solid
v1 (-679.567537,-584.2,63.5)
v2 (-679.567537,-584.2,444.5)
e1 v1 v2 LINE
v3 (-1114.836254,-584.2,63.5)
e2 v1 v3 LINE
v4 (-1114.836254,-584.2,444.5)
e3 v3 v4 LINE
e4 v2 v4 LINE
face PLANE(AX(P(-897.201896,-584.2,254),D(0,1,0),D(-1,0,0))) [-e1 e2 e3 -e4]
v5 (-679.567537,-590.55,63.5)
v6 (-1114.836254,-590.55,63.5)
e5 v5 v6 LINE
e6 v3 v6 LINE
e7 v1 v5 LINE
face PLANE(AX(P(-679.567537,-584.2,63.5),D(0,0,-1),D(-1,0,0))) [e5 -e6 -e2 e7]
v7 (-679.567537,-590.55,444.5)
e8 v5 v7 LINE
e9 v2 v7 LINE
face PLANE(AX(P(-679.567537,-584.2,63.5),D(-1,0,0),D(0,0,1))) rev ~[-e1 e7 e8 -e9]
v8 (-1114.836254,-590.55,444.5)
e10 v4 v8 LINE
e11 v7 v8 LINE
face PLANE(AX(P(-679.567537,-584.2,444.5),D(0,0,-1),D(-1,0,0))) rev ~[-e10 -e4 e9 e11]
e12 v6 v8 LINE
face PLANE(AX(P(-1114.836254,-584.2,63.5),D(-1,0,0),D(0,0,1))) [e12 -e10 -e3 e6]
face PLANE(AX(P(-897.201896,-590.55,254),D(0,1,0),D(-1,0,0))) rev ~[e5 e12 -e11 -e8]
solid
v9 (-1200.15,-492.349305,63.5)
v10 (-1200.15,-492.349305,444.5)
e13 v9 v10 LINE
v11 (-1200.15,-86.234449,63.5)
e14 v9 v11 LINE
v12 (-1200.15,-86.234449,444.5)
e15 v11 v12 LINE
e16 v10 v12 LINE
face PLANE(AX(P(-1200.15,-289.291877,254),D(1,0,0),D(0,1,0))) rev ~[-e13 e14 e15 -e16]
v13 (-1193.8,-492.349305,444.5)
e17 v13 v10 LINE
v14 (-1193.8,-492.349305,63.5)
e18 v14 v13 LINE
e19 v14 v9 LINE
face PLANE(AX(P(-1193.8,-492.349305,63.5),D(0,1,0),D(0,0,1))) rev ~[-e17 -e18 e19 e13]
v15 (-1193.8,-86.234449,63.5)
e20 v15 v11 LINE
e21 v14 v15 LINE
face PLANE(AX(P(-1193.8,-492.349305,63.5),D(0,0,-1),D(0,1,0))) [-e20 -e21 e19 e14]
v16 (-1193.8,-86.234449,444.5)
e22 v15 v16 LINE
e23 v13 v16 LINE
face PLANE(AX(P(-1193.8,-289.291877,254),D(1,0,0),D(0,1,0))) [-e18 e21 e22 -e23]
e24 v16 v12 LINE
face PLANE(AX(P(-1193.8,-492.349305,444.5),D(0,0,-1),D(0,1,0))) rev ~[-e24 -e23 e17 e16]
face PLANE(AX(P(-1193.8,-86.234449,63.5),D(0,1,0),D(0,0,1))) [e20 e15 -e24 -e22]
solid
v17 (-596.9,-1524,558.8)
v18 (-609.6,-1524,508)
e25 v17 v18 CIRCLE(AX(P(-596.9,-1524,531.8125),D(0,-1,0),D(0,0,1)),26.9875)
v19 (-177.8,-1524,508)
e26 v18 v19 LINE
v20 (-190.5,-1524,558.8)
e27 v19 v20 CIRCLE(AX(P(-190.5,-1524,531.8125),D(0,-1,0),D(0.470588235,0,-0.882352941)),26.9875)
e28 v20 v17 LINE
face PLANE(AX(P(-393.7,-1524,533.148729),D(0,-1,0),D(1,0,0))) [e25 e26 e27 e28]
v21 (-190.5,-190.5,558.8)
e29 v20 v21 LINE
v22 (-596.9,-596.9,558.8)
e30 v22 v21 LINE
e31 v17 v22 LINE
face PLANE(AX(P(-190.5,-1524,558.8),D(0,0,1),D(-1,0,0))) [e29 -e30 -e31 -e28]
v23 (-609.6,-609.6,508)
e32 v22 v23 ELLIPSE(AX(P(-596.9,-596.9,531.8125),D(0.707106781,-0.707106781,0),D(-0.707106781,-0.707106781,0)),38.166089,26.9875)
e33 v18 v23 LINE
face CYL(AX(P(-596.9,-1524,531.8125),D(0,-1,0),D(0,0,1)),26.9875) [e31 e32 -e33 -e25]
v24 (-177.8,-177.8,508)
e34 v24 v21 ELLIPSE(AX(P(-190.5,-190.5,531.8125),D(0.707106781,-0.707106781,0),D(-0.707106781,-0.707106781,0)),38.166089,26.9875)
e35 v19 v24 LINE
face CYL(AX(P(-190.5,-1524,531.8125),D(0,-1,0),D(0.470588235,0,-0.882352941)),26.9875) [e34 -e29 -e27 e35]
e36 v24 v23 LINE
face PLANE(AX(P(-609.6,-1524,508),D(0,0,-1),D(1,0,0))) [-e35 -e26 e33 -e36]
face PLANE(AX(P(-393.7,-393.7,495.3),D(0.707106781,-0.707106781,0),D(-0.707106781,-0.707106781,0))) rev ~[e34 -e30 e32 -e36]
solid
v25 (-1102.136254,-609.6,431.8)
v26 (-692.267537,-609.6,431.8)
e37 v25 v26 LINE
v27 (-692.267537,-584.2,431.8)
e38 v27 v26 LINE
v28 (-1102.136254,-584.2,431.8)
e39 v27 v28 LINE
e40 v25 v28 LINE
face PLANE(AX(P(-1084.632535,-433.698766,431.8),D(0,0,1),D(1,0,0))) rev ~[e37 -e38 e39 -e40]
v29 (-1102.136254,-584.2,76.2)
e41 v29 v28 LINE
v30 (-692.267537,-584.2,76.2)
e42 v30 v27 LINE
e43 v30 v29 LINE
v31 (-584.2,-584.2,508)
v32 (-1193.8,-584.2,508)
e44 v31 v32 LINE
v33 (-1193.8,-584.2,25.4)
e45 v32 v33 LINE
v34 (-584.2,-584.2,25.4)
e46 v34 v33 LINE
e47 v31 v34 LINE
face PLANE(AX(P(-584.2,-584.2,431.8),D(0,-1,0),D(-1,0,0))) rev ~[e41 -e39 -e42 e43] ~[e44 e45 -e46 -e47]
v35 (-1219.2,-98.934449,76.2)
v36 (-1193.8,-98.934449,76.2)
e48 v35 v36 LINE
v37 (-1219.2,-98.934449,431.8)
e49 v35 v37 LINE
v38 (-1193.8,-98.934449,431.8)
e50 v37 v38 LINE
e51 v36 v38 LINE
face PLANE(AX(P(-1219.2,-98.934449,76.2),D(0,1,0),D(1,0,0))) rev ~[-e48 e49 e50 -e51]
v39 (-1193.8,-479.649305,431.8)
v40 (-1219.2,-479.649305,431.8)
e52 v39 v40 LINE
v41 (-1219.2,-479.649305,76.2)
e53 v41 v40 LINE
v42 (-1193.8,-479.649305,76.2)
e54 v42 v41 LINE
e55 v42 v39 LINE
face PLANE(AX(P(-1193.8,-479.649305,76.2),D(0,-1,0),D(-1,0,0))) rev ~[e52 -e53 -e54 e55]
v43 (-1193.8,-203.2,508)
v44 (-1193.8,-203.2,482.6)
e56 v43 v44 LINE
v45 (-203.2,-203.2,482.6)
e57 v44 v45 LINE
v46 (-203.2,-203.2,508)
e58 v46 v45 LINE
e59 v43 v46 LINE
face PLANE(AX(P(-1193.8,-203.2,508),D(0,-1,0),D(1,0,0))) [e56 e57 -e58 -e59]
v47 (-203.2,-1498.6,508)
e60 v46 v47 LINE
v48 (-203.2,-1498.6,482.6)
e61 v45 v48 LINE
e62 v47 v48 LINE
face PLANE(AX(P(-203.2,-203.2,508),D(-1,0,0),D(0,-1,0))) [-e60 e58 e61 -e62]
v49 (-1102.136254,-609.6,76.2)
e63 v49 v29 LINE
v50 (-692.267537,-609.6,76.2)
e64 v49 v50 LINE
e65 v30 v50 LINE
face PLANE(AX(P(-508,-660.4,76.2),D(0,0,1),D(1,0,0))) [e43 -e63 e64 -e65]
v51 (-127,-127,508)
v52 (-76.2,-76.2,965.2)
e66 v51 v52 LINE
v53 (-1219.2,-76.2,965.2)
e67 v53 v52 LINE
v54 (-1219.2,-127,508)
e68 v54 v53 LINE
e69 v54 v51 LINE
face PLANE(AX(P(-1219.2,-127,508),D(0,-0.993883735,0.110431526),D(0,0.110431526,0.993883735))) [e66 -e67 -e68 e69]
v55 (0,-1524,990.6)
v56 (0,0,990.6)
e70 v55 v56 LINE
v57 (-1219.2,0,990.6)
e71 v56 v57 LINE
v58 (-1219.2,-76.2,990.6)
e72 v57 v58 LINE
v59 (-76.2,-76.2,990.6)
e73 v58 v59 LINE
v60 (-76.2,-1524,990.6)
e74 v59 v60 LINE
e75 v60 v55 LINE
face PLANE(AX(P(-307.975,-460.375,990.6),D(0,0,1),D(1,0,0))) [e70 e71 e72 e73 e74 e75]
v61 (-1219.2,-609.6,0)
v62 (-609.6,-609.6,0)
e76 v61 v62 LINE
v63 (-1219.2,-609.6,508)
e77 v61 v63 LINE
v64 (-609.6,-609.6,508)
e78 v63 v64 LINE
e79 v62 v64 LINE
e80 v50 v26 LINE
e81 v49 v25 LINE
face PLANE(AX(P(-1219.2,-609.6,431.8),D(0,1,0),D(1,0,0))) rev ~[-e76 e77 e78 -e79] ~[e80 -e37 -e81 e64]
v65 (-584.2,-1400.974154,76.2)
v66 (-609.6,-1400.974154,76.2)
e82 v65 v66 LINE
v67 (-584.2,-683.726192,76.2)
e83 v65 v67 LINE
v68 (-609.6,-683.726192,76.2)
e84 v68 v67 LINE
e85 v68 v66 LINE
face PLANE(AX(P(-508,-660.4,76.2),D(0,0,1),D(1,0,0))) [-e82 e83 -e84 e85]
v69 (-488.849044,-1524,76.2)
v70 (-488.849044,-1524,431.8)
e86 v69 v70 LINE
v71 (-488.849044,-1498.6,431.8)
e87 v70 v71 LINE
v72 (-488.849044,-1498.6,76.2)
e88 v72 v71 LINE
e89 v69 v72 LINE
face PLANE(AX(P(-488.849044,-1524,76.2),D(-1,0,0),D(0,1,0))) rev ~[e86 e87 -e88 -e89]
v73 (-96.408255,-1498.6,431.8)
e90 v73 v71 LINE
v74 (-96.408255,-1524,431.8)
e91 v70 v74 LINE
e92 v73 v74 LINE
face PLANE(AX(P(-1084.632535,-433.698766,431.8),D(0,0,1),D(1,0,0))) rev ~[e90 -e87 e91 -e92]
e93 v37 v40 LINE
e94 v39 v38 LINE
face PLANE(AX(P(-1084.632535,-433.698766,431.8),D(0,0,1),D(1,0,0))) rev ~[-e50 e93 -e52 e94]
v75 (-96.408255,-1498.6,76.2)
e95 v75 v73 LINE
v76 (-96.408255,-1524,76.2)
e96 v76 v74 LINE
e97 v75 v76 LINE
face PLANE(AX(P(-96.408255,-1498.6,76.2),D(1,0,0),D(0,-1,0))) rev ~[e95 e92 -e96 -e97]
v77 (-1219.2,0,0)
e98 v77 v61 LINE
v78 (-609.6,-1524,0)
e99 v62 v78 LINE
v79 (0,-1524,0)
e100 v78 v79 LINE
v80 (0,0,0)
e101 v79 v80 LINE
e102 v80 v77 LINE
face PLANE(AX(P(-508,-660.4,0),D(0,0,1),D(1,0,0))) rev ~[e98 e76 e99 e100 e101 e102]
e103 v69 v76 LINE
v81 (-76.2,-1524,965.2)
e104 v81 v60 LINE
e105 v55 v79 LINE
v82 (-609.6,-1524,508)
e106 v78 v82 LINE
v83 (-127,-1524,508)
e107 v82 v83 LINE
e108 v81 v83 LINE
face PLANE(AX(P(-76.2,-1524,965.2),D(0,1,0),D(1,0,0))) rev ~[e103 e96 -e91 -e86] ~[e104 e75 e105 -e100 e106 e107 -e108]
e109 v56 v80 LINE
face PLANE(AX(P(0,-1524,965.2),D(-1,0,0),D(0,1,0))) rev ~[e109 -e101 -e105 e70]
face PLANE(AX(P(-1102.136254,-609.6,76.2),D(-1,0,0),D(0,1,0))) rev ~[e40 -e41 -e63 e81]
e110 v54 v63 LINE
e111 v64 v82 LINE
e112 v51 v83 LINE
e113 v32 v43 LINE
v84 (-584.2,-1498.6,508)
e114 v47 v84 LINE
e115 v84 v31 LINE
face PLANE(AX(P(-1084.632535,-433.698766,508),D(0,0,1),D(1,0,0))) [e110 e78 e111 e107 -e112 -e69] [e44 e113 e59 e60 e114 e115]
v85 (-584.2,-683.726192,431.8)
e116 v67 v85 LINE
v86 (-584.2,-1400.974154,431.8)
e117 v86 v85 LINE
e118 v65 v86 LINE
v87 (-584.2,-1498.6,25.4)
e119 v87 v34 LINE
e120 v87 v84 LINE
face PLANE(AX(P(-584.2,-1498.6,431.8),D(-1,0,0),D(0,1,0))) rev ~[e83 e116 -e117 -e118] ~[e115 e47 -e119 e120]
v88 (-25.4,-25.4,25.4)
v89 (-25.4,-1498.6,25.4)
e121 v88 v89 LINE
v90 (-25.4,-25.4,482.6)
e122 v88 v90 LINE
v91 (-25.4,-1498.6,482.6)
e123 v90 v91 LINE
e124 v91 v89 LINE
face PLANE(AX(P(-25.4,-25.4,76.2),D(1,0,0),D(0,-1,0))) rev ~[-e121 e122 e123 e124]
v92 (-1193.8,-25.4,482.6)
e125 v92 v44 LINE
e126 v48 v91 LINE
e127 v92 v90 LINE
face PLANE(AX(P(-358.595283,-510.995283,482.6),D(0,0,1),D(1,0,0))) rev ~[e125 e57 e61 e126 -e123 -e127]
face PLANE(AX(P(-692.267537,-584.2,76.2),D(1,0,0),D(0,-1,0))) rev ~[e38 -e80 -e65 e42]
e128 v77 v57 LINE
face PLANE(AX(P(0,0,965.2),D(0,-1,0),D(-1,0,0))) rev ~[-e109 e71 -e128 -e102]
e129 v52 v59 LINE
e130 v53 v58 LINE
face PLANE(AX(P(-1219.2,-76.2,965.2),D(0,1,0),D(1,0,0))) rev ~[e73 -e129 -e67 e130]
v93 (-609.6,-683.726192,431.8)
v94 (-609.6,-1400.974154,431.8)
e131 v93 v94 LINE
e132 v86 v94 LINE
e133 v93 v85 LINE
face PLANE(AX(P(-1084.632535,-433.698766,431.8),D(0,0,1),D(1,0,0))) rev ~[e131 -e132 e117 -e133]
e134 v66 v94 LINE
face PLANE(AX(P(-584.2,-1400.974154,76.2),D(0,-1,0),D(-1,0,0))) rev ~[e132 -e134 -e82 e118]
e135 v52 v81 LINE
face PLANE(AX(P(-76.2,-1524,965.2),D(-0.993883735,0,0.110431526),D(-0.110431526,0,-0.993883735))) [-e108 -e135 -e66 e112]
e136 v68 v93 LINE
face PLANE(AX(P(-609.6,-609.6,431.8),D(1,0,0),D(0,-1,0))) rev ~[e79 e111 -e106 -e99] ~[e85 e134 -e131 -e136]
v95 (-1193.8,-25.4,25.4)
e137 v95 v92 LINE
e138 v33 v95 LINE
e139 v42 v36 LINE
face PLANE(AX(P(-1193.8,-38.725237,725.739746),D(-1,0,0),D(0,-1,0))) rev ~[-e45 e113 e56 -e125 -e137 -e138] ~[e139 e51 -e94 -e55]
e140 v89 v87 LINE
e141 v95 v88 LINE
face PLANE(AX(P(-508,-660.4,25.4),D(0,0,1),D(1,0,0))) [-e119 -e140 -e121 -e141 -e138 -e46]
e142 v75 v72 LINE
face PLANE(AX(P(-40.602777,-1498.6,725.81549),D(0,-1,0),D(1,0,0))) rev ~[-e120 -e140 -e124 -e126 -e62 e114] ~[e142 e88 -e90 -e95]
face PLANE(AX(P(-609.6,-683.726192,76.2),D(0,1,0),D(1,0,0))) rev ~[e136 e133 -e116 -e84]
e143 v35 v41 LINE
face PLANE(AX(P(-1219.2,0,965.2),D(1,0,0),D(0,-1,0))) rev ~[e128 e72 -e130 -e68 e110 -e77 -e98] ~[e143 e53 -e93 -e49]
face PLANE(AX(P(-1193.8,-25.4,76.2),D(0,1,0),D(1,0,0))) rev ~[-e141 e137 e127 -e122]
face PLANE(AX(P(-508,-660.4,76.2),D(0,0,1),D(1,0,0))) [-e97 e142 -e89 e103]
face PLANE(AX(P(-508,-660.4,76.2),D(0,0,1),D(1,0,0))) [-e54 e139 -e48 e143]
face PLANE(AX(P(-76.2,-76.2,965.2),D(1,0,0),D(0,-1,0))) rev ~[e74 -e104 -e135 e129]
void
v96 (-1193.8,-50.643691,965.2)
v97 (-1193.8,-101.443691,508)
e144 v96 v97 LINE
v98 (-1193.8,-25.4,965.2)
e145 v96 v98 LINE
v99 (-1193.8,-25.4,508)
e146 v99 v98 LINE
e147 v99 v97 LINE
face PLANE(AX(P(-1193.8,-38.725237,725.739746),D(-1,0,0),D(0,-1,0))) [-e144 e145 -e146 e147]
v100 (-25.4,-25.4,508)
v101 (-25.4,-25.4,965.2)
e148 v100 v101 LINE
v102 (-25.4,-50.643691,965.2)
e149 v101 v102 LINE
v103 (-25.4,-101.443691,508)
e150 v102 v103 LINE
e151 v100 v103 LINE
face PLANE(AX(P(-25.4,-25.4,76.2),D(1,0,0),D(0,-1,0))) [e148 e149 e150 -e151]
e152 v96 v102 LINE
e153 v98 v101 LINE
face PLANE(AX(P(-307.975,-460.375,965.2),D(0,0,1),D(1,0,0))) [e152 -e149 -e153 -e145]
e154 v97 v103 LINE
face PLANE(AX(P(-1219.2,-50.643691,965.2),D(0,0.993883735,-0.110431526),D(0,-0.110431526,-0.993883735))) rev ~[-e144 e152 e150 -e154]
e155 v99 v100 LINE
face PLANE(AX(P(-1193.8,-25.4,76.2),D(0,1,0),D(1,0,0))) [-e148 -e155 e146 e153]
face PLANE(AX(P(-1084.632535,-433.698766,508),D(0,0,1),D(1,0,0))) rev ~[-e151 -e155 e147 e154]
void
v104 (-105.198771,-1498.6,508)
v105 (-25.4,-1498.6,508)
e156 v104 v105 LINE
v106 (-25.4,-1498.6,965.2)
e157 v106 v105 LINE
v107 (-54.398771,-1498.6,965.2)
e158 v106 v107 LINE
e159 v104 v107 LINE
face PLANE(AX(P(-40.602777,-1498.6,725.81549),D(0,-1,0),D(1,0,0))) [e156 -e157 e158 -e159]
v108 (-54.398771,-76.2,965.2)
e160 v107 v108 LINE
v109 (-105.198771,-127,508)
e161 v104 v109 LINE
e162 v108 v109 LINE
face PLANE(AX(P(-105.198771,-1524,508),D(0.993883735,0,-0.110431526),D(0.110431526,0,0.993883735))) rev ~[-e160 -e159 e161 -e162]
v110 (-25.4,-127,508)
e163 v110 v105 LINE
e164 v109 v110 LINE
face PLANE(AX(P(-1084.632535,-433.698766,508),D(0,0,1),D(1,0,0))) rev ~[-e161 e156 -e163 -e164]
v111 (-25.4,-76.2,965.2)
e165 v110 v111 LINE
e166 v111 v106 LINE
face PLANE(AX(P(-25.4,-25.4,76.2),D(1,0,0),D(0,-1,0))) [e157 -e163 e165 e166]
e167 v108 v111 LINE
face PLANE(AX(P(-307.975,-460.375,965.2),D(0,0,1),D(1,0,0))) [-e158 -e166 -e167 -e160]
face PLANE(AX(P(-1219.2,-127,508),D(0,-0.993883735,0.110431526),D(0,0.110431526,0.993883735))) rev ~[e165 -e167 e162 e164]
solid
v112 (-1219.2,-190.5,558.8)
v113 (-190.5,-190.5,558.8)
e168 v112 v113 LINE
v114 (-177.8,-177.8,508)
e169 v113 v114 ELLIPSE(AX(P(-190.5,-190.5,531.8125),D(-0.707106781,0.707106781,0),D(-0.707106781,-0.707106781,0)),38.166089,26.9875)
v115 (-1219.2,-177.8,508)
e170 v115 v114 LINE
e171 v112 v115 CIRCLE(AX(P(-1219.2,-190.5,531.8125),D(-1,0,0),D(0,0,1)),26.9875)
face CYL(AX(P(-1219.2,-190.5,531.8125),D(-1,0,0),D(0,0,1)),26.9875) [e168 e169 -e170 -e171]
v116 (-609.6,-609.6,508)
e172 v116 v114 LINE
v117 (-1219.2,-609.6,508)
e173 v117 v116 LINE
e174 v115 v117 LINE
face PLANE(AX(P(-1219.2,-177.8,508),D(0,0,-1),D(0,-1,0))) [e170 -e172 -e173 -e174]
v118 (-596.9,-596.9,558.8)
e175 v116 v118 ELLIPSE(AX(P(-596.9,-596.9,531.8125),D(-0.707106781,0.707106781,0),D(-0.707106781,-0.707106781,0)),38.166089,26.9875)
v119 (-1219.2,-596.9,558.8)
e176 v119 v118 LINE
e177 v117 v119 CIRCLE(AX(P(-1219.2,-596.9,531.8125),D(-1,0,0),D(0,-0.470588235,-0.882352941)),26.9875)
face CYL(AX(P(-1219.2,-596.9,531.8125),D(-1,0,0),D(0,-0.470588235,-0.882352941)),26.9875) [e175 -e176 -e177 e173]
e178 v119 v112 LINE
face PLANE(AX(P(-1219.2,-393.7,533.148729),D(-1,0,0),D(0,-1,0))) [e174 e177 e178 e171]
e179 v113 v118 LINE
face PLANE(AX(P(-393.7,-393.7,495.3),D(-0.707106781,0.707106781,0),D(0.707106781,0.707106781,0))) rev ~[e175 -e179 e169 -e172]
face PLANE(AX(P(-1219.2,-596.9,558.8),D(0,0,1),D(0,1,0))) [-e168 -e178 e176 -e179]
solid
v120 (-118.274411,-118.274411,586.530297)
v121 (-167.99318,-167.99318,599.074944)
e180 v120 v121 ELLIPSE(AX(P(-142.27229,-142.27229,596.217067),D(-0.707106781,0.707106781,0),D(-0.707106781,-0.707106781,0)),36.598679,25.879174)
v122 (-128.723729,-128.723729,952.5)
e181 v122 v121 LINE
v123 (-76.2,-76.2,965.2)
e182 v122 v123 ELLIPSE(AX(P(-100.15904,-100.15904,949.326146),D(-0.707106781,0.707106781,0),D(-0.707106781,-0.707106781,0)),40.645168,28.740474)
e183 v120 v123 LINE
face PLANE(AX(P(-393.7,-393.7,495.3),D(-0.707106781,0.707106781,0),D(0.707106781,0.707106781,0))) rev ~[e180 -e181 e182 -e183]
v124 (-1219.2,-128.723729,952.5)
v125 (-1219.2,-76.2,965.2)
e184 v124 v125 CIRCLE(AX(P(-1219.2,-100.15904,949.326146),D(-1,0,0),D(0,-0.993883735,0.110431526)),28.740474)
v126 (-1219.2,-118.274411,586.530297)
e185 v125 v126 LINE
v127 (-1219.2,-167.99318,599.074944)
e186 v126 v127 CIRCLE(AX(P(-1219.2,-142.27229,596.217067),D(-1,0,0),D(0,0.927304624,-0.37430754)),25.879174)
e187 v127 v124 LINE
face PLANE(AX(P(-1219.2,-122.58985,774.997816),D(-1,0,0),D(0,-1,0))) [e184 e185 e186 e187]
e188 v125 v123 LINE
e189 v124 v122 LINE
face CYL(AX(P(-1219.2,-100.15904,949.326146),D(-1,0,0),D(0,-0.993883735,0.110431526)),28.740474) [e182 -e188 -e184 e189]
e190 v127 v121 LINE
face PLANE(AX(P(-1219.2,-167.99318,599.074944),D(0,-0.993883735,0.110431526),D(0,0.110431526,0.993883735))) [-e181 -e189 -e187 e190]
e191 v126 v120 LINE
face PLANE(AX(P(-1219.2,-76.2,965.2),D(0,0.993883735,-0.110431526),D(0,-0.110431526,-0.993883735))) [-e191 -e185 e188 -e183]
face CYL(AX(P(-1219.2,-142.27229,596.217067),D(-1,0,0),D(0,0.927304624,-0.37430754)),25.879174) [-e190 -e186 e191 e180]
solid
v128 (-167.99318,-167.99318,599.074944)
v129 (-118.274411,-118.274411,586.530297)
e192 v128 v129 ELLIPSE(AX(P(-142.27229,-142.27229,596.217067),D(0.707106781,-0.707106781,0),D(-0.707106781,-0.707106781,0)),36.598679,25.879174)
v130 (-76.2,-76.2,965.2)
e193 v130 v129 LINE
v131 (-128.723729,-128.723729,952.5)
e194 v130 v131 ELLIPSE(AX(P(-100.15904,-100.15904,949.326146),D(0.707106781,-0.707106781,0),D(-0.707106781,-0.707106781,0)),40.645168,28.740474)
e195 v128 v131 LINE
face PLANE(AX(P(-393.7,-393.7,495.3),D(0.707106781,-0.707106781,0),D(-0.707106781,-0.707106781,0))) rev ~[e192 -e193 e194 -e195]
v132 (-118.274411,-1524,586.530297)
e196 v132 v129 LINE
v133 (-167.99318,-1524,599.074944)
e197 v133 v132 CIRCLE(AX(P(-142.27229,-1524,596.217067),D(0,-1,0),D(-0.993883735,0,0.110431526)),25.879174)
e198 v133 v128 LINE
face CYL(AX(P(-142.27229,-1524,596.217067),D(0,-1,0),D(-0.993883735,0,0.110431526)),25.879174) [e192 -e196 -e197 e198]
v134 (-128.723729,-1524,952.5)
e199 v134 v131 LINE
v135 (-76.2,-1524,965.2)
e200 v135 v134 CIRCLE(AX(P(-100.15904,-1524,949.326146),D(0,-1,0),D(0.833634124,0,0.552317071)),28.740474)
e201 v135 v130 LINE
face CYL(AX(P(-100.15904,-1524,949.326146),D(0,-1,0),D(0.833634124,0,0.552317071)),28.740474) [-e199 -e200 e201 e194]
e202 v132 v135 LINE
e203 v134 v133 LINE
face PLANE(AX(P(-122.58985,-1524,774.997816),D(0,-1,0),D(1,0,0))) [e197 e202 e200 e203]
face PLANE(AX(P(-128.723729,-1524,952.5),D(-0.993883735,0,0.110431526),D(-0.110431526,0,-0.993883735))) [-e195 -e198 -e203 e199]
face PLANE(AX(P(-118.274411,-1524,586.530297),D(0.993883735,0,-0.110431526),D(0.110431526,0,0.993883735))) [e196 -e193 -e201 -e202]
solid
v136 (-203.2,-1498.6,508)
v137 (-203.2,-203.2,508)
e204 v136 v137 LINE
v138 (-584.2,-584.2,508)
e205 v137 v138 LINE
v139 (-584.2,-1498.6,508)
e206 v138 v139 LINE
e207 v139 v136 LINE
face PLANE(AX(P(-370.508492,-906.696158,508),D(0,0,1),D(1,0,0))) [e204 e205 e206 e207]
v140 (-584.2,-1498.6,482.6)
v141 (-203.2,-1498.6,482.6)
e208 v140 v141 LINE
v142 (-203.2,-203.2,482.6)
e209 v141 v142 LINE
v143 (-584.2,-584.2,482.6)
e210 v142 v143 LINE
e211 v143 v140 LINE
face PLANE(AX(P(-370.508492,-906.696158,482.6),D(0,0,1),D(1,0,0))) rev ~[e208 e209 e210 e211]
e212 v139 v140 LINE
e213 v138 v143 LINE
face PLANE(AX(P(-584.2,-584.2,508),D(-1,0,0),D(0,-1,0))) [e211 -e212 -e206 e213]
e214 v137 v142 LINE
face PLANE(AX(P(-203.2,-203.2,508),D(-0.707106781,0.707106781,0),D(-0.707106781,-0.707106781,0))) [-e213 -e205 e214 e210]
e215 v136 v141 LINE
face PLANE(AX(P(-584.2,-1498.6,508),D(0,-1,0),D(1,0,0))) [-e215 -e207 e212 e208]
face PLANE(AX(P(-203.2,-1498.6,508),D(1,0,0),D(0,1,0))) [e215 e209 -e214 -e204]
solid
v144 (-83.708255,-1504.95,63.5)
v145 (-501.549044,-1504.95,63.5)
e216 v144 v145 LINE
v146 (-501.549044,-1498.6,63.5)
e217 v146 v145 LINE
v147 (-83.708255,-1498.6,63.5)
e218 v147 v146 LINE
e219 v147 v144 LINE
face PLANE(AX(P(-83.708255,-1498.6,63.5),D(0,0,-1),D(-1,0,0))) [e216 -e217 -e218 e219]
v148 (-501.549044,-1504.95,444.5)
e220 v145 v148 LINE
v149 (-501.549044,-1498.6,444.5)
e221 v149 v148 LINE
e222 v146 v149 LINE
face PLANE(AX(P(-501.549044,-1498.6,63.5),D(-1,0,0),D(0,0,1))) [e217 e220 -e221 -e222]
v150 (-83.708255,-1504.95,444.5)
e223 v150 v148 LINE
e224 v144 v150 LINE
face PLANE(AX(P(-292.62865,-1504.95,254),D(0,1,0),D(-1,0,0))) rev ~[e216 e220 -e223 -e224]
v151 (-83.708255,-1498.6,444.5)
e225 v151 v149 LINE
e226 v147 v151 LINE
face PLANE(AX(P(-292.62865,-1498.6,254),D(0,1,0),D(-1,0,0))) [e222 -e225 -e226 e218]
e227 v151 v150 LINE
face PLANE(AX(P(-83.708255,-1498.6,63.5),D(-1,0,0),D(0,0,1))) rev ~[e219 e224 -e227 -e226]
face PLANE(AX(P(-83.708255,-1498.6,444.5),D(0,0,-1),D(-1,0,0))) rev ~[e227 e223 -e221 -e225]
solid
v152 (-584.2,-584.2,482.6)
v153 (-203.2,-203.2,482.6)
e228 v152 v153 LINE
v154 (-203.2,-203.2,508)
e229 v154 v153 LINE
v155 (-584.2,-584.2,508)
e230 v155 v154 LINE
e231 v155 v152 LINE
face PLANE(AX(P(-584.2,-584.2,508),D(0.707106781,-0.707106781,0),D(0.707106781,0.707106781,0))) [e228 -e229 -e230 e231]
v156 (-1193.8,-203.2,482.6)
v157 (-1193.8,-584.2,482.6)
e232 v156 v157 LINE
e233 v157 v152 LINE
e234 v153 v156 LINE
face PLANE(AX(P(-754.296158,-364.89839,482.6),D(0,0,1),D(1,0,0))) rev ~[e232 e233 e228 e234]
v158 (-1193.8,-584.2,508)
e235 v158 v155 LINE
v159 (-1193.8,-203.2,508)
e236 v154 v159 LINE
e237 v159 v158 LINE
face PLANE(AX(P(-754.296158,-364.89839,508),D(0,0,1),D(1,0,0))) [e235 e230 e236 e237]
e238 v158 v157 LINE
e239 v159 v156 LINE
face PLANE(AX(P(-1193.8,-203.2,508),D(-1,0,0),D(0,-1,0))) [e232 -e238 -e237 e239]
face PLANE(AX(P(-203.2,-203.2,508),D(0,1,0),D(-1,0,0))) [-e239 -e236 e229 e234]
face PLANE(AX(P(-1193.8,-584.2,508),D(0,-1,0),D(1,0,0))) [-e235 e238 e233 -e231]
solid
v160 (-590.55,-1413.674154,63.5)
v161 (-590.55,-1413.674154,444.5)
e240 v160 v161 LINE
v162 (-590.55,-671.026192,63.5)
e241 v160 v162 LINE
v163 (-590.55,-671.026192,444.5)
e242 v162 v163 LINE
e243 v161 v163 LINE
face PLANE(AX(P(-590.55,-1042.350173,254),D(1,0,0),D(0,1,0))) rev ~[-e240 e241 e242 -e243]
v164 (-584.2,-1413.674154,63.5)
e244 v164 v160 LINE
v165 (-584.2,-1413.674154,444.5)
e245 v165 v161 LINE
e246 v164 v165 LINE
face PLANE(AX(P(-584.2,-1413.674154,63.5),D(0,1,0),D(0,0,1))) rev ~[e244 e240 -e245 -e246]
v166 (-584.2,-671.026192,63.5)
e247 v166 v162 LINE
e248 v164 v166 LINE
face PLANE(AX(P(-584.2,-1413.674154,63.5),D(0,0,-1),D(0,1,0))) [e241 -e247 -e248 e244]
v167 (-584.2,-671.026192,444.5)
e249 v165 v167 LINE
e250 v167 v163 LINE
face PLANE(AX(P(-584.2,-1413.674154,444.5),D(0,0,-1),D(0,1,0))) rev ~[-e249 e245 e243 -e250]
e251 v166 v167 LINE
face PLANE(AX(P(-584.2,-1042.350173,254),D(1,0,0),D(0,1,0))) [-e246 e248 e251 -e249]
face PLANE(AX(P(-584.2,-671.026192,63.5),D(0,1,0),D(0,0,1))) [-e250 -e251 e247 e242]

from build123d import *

# Parameters (mm, degrees)
F1_DEPTH  = 76.2
F2_DEPTH  = 25.4
F3_W      = 1168.4
F3_H      = 25.4
F4_DEPTH  = 889
F5_DEPTH  = 355.6
F7_DEPTH  = 76.2
F9_DEPTH  = 25.4
F11_DEPTH = 25.4
F13_DEPTH = 25.4
F14_DEPTH = 1193.8
F15_REACH = 1986.929480867
F16_W     = 406.1148560882
F16_H     = 381
F16_W_2   = 380.7148560882
F16_H_2   = 355.6
F17_DEPTH = 6.35
F18_W     = 435.2687171936
F18_H     = 381
F18_W_2   = 409.8687171936
F18_H_2   = 355.6
F19_DEPTH = 6.35
F20_W     = 742.6479629517
F20_H     = 381
F20_W_2   = 717.2479629517
F20_H_2   = 355.6
F21_DEPTH = 6.35
F22_W     = 417.8407884479
F22_H     = 381
F22_W_2   = 392.4407884479
F22_H_2   = 355.6
F23_DEPTH = 6.35
F25_DEPTH = 25.4
F26_DEPTH = 25.4
F28_REACH = 1987.1702785851
F30_REACH = 1682.3702785851
F32_DEPTH = 25.4


with BuildPart() as f1:
    # F0 (on Top) → F1 (new body)
    with BuildSketch(Plane.XY):
        Polygon((0, -1524), (0, 0), (-1219.2, 0), (-1219.2, -127), (-1219.2, -609.6), (-609.6, -609.6), (-609.6, -1524), (-127, -1524), align=None)
        Polygon((-584.2, -584.2), (-1193.8, -584.2), (-1193.8, -25.4), (-25.4, -25.4), (-25.4, -1498.6), (-584.2, -1498.6), align=None, mode=Mode.SUBTRACT)
    extrude(amount=F1_DEPTH)

    # F0 (on Top) → F2 (join)
    with BuildSketch(Plane.XY):
        Polygon((0, -1524), (0, 0), (-1219.2, 0), (-1219.2, -127), (-1219.2, -609.6), (-609.6, -609.6), (-609.6, -1524), (-127, -1524), align=None)
        Polygon((-584.2, -584.2), (-1193.8, -584.2), (-1193.8, -25.4), (-25.4, -25.4), (-25.4, -1498.6), (-584.2, -1498.6), align=None, mode=Mode.SUBTRACT)
        Polygon((-1193.8, -25.4), (-1193.8, -584.2), (-584.2, -584.2), (-584.2, -1498.6), (-25.4, -1498.6), (-25.4, -25.4), align=None)
    extrude(amount=F2_DEPTH)

    # F3 (on face) → F4 (join)
    with BuildSketch(Plane.XY.offset(76.2)):
        with Locations((-609.6, -12.7)):
            Rectangle(F3_W, F3_H)
        Polygon((-25.4, 0), (-25.4, -25.4), (-25.4, -1498.6), (0, -1498.6), (0, 0), align=None)
    extrude(amount=F4_DEPTH)

    # F3 (on face) → F5 (join)
    with BuildSketch(Plane.XY.offset(76.2)):
        Polygon((-1219.2, -479.6493053436), (-1219.2, -609.6), (-1102.1362543106, -609.6), (-1102.1362543106, -584.2), (-1193.8, -584.2), (-1193.8, -479.6493053436), align=None)
        Polygon((-1219.2, 0), (-1219.2, -98.9344492555), (-1193.8, -98.9344492555), (-1193.8, -25.4), (-1193.8, 0), align=None)
        Polygon((-692.267537117, -584.2), (-692.267537117, -609.6), (-609.6, -609.6), (-609.6, -683.7261915207), (-584.2, -683.7261915207), (-584.2, -584.2), align=None)
        Polygon((-584.2, -1400.9741544724), (-609.6, -1400.9741544724), (-609.6, -1524), (-488.8490438461, -1524), (-488.8490438461, -1498.6), (-584.2, -1498.6), align=None)
        Polygon((0, -1498.6), (-25.4, -1498.6), (-96.4082553983, -1498.6), (-96.4082553983, -1524), (0, -1524), align=None)
    extrude(amount=F5_DEPTH)

    # F6 (on face) → F7 (join)
    with BuildSketch(Plane.XY.offset(431.8)):
        Polygon((-692.267537117, -609.6), (-692.267537117, -584.2), (-1193.8, -584.2), (-1193.8, 0), (-1219.2, 0), (-1219.2, -609.6), align=None)
        Polygon((-584.2, -683.7261915207), (-584.2, -584.2), (-692.267537117, -584.2), (-692.267537117, -609.6), (-609.6, -609.6), (-609.6, -683.7261915207), align=None)
        Polygon((-584.2, -1498.6), (-584.2, -683.7261915207), (-609.6, -683.7261915207), (-609.6, -1524), (0, -1524), (0, -1498.6), align=None)
    extrude(amount=F7_DEPTH)

    # F8 (on face) → F9 (join)
    with BuildSketch(Plane.XZ.offset(1524)):
        Polygon((0, 508), (0, 965.2), (-54.3987713754, 965.2), (-105.1987713754, 508), align=None)
        Polygon((-105.1987713754, 508), (-54.3987713754, 965.2), (-76.2, 965.2), (-127, 508), align=None)
    extrude(amount=-F9_DEPTH)

    # F10 (on face) → F11 (join)
    with BuildSketch(Plane(origin=(-1219.2, 0, 0), x_dir=(0, -1, 0), z_dir=(-1, 0, 0))):
        Polygon((50.6436908324, 965.2), (0, 965.2), (0, 508), (101.4436908324, 508), align=None)
        Polygon((76.2, 965.2), (50.6436908324, 965.2), (101.4436908324, 508), (127, 508), align=None)
    extrude(amount=-F11_DEPTH)

    # F12 (on face) → F13 (join)
    with BuildSketch(Plane.XY.offset(508)):
        Polygon((-1193.8, 0), (-1193.8, -203.2), (-203.2, -203.2), (-203.2, -1498.6), (0, -1498.6), (0, 0), align=None)
    extrude(amount=-F13_DEPTH)

    # F10 (on face) → F14 (join, through all)
    with BuildSketch(Plane(origin=(-1219.2, 0, 0), x_dir=(0, -1, 0), z_dir=(-1, 0, 0))):
        Polygon((76.2, 965.2), (50.6436908324, 965.2), (101.4436908324, 508), (127, 508), align=None)
    extrude(amount=-F14_DEPTH)

    f15_end = f1.faces().sort_by_distance((-622.3, -101.6, 736.6))[0]
    # F8 (on face) → F15 (join, up to a face of the model that its end follows)
    with BuildSketch(Plane.XZ.offset(1524)):
        Polygon((-105.1987713754, 508), (-54.3987713754, 965.2), (-76.2, 965.2), (-127, 508), align=None)
    f15_long = extrude(amount=-F15_REACH, mode=Mode.PRIVATE)
    add(split(f15_long, bisect_by=f15_end, keep=Keep.TOP, mode=Mode.PRIVATE))

    # F31 (on face) → F32 (join)
    with BuildSketch(Plane.XY.offset(965.2)):
        Polygon((0, 0), (-1219.2, 0), (-1219.2, -76.2), (-76.2, -76.2), (-76.2, -1524), (0, -1524), align=None)
    extrude(amount=F32_DEPTH)


with BuildPart() as f17:
    # F16 (on face) → F17 (new body)
    with BuildSketch(Plane.YZ.offset(-1193.8)):
        with Locations((-289.2918772995, 254)):
            Rectangle(F16_W, F16_H)
        with Locations((-289.2918772995, 254)):
            Rectangle(F16_W_2, F16_H_2, mode=Mode.SUBTRACT)
        with Locations((-289.2918772995, 254)):
            Rectangle(F16_W_2, F16_H_2)
    extrude(amount=-F17_DEPTH)


with BuildPart() as f19:
    # F18 (on face) → F19 (new body)
    with BuildSketch(Plane(origin=(0, -584.2, 0), x_dir=(-1, 0, 0), z_dir=(0, 1, 0))):
        with Locations((897.2018957138, 254)):
            Rectangle(F18_W, F18_H)
        with Locations((897.2018957138, 254)):
            Rectangle(F18_W_2, F18_H_2, mode=Mode.SUBTRACT)
        with Locations((897.2018957138, 254)):
            Rectangle(F18_W_2, F18_H_2)
    extrude(amount=-F19_DEPTH)


with BuildPart() as f21:
    # F20 (on face) → F21 (new body)
    with BuildSketch(Plane.YZ.offset(-584.2)):
        with Locations((-1042.3501729965, 254)):
            Rectangle(F20_W, F20_H)
        with Locations((-1042.3501729965, 254)):
            Rectangle(F20_W_2, F20_H_2, mode=Mode.SUBTRACT)
        with Locations((-1042.3501729965, 254)):
            Rectangle(F20_W_2, F20_H_2)
    extrude(amount=-F21_DEPTH)


with BuildPart() as f23:
    # F22 (on face) → F23 (new body)
    with BuildSketch(Plane(origin=(0, -1498.6, 0), x_dir=(-1, 0, 0), z_dir=(0, 1, 0))):
        with Locations((292.6286496222, 254)):
            Rectangle(F22_W, F22_H)
        with Locations((292.6286496222, 254)):
            Rectangle(F22_W_2, F22_H_2, mode=Mode.SUBTRACT)
        with Locations((292.6286496222, 254)):
            Rectangle(F22_W_2, F22_H_2)
    extrude(amount=-F23_DEPTH)


with BuildPart() as f25:
    # F24 (on face) → F25 (new body)
    with BuildSketch(Plane.XY.offset(508)):
        Polygon((-203.2, -203.2), (-1193.8, -203.2), (-1193.8, -584.2), (-584.2, -584.2), align=None)
    extrude(amount=-F25_DEPTH)


with BuildPart() as f26:
    # F24 (on face) → F26 (new body)
    with BuildSketch(Plane.XY.offset(508)):
        Polygon((-203.2, -1498.6), (-203.2, -203.2), (-584.2, -584.2), (-584.2, -1498.6), align=None)
    extrude(amount=-F26_DEPTH)


with BuildPart() as f28:
    f28_end = Plane(origin=(-393.7, -393.7, 495.3), x_dir=(-0.7071067812, -0.7071067812, 0), z_dir=(0.7071067812, -0.7071067812, 0))
    # F27 (on face) → F28 (new body, up to a plane its end follows)
    with BuildSketch(Plane.XZ.offset(1524)):
        with BuildLine():
            ThreePointArc((-596.9, 558.8), (-623.0817207227, 538.3579301807), (-609.6, 508))
            Line((-609.6, 508), (-177.8, 508))
            ThreePointArc((-177.8, 508), (-164.3182792773, 538.3579301807), (-190.5, 558.8))
            Line((-190.5, 558.8), (-596.9, 558.8))
        make_face()
    f28_long = extrude(amount=-F28_REACH, mode=Mode.PRIVATE)
    add(split(f28_long, bisect_by=f28_end, keep=Keep.TOP, mode=Mode.PRIVATE))


with BuildPart() as f28b:
    f28_2_end = Plane(origin=(-393.7, -393.7, 495.3), x_dir=(-0.7071067812, -0.7071067812, 0), z_dir=(0.7071067812, -0.7071067812, 0))
    # F27 (on face) → F28, piece 2 (new body, up to a plane its end follows)
    with BuildSketch(Plane.XZ.offset(1524)):
        with BuildLine():
            ThreePointArc((-167.9931801186, 599.0749439501), (-148.6035006779, 571.1242906487), (-118.2744114345, 586.5302970894))
            Line((-118.2744114345, 586.5302970894), (-76.2, 965.2))
            ThreePointArc((-76.2, 965.2), (-106.9137050785, 977.2615951465), (-128.7237294464, 952.5))
            Line((-128.7237294464, 952.5), (-167.9931801186, 599.0749439501))
        make_face()
    f28_2_long = extrude(amount=-F28_REACH, mode=Mode.PRIVATE)
    add(split(f28_2_long, bisect_by=f28_2_end, keep=Keep.TOP, mode=Mode.PRIVATE))


with BuildPart() as f30:
    f30_end = Plane(origin=(-393.7, -393.7, 495.3), x_dir=(0.7071067812, 0.7071067812, 0), z_dir=(-0.7071067812, 0.7071067812, 0))
    # F29 (on face) → F30 (new body, up to a plane its end follows)
    with BuildSketch(Plane(origin=(-1219.2, 0, 0), x_dir=(0, -1, 0), z_dir=(-1, 0, 0))):
        with BuildLine():
            Line((177.8, 508), (609.6, 508))
            ThreePointArc((609.6, 508), (623.0817207227, 538.3579301807), (596.9, 558.8))
            Line((596.9, 558.8), (190.5, 558.8))
            ThreePointArc((190.5, 558.8), (164.3182792773, 538.3579301807), (177.8, 508))
        make_face()
    f30_long = extrude(amount=-F30_REACH, mode=Mode.PRIVATE)
    add(split(f30_long, bisect_by=f30_end, keep=Keep.TOP, mode=Mode.PRIVATE))


with BuildPart() as f30b:
    f30_2_end = Plane(origin=(-393.7, -393.7, 495.3), x_dir=(0.7071067812, 0.7071067812, 0), z_dir=(-0.7071067812, 0.7071067812, 0))
    # F29 (on face) → F30, piece 2 (new body, up to a plane its end follows)
    with BuildSketch(Plane(origin=(-1219.2, 0, 0), x_dir=(0, -1, 0), z_dir=(-1, 0, 0))):
        with BuildLine():
            Line((76.2, 965.2), (118.2744114345, 586.5302970894))
            ThreePointArc((118.2744114345, 586.5302970894), (148.6035006779, 571.1242906487), (167.9931801186, 599.0749439501))
            Line((167.9931801186, 599.0749439501), (128.7237294464, 952.5))
            ThreePointArc((128.7237294464, 952.5), (106.9137050785, 977.2615951465), (76.2, 965.2))
        make_face()
    f30_2_long = extrude(amount=-F30_REACH, mode=Mode.PRIVATE)
    add(split(f30_2_long, bisect_by=f30_2_end, keep=Keep.TOP, mode=Mode.PRIVATE))


solid = Compound([f1.part, f17.part, f19.part, f21.part, f23.part, f25.part, f26.part, f28.part, f28b.part, f30.part, f30b.part])
